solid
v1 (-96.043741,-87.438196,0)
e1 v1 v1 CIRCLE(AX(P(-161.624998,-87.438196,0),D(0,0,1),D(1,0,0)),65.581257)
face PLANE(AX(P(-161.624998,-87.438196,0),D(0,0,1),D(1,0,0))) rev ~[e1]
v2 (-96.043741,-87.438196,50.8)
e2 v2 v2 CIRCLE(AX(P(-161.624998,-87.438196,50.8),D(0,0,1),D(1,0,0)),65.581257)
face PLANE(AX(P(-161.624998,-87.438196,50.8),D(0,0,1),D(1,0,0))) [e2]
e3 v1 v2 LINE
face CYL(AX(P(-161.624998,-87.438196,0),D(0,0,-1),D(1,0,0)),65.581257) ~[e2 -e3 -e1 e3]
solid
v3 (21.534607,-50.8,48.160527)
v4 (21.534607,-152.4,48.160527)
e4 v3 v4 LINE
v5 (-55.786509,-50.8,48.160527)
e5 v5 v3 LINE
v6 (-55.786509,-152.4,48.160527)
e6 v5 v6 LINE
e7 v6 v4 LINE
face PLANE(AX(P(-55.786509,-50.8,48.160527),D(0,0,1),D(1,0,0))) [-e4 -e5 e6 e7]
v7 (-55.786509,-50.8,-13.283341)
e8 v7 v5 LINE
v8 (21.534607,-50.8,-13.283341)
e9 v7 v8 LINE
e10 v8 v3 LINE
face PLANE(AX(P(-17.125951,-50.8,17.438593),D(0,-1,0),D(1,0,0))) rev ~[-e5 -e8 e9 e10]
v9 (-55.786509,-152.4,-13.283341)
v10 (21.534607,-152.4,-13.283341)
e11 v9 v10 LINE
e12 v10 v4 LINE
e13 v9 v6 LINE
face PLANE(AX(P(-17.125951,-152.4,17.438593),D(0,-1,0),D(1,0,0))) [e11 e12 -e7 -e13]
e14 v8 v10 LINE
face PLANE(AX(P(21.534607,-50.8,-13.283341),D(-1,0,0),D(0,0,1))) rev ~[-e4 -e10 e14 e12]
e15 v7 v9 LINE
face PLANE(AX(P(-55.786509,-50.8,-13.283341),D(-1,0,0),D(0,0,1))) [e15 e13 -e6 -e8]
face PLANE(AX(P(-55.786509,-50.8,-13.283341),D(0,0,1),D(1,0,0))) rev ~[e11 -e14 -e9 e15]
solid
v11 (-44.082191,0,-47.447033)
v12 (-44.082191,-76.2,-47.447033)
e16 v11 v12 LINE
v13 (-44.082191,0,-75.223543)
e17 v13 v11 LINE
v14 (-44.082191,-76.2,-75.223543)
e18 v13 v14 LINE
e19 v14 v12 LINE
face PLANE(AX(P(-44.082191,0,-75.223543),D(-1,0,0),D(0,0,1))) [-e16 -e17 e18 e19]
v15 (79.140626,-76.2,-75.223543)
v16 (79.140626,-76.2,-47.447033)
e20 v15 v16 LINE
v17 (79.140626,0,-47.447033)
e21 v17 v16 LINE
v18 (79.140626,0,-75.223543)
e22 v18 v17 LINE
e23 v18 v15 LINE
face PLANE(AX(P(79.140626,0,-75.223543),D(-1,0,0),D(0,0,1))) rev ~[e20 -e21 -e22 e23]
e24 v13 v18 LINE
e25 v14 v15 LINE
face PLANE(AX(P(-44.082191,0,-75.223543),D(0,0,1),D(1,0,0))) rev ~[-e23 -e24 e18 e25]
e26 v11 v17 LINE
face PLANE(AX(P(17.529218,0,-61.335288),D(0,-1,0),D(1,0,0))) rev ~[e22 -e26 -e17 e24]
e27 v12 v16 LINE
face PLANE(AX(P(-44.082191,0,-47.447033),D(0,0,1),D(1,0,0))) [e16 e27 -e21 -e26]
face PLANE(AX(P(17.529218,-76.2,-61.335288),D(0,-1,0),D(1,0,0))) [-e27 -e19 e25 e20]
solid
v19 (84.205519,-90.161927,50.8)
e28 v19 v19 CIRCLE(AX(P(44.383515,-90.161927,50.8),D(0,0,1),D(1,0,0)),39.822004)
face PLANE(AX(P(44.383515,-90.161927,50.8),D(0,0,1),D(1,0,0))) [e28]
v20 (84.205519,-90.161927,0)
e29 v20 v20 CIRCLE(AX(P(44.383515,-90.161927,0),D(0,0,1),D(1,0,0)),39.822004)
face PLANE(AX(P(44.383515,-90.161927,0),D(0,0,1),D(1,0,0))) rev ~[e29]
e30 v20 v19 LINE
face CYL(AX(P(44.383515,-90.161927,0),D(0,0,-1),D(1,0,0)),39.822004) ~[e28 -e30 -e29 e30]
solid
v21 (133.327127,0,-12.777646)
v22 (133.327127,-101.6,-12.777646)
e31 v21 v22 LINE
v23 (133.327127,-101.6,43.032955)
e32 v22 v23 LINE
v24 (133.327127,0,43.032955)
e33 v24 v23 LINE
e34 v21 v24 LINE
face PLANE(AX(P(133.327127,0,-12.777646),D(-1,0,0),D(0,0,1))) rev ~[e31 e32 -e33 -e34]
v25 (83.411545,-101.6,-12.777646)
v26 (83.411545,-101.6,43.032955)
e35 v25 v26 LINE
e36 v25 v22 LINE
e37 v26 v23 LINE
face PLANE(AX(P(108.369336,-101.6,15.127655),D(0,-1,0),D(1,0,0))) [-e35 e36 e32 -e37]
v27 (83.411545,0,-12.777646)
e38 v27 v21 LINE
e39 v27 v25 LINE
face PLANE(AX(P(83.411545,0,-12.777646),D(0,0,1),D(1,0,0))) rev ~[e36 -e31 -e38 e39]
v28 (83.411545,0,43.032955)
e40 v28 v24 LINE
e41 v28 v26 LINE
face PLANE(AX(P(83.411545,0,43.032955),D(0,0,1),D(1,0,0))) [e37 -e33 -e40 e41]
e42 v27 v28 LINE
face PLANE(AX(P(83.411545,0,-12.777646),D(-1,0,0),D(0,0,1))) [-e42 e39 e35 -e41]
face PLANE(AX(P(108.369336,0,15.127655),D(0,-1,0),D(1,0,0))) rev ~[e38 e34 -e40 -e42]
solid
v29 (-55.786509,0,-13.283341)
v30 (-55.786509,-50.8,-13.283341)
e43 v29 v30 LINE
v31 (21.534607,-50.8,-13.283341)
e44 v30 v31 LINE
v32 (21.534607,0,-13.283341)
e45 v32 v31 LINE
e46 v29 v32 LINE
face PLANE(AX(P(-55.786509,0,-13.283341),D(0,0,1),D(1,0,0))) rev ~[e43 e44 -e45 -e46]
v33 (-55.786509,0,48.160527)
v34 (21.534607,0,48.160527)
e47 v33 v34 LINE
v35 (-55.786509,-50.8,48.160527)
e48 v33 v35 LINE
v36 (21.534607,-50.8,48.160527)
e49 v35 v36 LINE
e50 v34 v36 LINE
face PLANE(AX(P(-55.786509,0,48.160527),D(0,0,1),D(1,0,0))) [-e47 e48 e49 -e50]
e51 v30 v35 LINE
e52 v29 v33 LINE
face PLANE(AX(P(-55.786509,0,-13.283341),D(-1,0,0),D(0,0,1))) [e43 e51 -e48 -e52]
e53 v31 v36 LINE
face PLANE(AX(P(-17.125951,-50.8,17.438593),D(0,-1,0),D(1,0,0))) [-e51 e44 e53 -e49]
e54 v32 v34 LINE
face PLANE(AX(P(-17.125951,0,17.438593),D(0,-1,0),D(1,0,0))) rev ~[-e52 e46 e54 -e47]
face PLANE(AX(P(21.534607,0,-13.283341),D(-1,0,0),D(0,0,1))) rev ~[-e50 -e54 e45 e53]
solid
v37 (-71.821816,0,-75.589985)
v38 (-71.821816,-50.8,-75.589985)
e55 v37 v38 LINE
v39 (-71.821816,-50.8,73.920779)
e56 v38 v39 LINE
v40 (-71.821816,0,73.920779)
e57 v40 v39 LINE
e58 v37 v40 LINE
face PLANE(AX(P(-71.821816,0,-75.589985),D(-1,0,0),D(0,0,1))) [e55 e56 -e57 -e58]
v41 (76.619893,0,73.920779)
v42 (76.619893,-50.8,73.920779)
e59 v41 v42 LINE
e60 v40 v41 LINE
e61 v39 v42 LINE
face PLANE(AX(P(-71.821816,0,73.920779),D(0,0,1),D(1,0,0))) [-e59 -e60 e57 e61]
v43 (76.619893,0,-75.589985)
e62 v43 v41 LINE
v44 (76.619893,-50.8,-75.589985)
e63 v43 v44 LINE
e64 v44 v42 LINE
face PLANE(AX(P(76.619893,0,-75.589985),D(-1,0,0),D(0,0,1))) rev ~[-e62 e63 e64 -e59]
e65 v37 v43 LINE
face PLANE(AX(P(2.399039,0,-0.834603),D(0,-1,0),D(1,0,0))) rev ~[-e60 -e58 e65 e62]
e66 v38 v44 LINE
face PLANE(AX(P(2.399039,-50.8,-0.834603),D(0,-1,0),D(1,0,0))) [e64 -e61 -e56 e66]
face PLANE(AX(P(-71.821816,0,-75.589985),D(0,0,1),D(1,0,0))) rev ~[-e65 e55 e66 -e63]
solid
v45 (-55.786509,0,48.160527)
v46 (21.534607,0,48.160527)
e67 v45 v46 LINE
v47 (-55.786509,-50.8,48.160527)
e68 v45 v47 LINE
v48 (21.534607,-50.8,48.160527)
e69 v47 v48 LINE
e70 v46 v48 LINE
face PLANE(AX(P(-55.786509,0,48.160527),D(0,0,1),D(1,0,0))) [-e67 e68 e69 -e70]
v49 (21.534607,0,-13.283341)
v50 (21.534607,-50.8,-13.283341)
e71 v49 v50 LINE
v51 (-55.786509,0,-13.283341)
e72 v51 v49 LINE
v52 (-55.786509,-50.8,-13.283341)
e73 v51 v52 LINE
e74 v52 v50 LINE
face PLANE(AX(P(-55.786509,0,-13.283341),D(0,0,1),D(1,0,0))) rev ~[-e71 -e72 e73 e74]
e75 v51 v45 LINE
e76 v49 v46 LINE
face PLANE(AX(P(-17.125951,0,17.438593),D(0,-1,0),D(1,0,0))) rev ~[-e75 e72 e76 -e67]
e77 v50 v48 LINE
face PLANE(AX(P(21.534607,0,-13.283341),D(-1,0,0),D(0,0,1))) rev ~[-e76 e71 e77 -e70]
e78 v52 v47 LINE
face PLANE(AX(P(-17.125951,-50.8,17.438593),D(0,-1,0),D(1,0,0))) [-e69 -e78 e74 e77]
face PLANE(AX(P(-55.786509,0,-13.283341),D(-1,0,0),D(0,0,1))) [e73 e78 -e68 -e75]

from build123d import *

# Parameters (mm, degrees)
F0_W      = 77.3211158812
F0_H      = 61.4438680932
F1_DEPTH  = 50.8
F2_W      = 49.9155819416
F2_H      = 55.8106014505
F3_DEPTH  = 101.6
F4_W      = 123.2228167355
F4_H      = 27.7765095234
F5_DEPTH  = 76.2
F6_W      = 148.441709578
F6_H      = 149.5107635856
F7_DEPTH  = 50.8
F8_DEPTH  = 101.6
F9_R      = 65.5812572733
F10_DEPTH = 50.8
F11_DEPTH = 50.8
F14_R     = 39.8220041085
F15_DEPTH = 50.8


# Not quite as in the source:
# - the program builds the solid bodies; features that only make, move or delete a surface that nothing else refers to are left out


with BuildPart() as f1:
    # F0 (on Front) → F1 (new body)
    with BuildSketch(Plane.XZ):
        with Locations((-17.1259511262, 17.4385928549)):
            Rectangle(F0_W, F0_H)
    extrude(amount=F1_DEPTH)


with BuildPart() as f3:
    # F2 (on Front) → F3 (new body)
    with BuildSketch(Plane.XZ):
        with Locations((108.3693355322, 15.127654653)):
            Rectangle(F2_W, F2_H)
    extrude(amount=F3_DEPTH)


with BuildPart() as f5:
    # F4 (on Front) → F5 (new body)
    with BuildSketch(Plane.XZ):
        with Locations((17.5292175263, -61.3352879882)):
            Rectangle(F4_W, F4_H)
    extrude(amount=F5_DEPTH)


with BuildPart() as f7:
    # F6 (on Front) → F7 (new body)
    with BuildSketch(Plane.XZ):
        with Locations((2.3990385234, -0.8346028626)):
            Rectangle(F6_W, F6_H)
    extrude(amount=F7_DEPTH)


with BuildPart() as f8:
    # F8 (new): a face of the model
    f8_faces = [f1.part.faces().sort_by_distance(p)[0] for p in [
        (-17.1259511262, -50.8, 17.4385928549),
    ]]
    extrude(f8_faces, amount=F8_DEPTH)


with BuildPart() as f10:
    # F9 (on Top) → F10 (new body)
    with BuildSketch(Plane.XY):
        with Locations((-161.6249978542, -87.4381959438)):
            Circle(F9_R)
    extrude(amount=F10_DEPTH)


with BuildPart() as f11:
    # F0 (on Front) → F11 (new body)
    with BuildSketch(Plane.XZ):
        with Locations((-17.1259511262, 17.4385928549)):
            Rectangle(F0_W, F0_H)
    extrude(amount=F11_DEPTH)


with BuildPart() as f15:
    # F14 (on Top) → F15 (new body)
    with BuildSketch(Plane.XY):
        with Locations((44.3835146725, -90.1619270444)):
            Circle(F14_R)
    extrude(amount=F15_DEPTH)


solid = Compound([f1.part, f3.part, f5.part, f7.part, f8.part, f10.part, f11.part, f15.part])
